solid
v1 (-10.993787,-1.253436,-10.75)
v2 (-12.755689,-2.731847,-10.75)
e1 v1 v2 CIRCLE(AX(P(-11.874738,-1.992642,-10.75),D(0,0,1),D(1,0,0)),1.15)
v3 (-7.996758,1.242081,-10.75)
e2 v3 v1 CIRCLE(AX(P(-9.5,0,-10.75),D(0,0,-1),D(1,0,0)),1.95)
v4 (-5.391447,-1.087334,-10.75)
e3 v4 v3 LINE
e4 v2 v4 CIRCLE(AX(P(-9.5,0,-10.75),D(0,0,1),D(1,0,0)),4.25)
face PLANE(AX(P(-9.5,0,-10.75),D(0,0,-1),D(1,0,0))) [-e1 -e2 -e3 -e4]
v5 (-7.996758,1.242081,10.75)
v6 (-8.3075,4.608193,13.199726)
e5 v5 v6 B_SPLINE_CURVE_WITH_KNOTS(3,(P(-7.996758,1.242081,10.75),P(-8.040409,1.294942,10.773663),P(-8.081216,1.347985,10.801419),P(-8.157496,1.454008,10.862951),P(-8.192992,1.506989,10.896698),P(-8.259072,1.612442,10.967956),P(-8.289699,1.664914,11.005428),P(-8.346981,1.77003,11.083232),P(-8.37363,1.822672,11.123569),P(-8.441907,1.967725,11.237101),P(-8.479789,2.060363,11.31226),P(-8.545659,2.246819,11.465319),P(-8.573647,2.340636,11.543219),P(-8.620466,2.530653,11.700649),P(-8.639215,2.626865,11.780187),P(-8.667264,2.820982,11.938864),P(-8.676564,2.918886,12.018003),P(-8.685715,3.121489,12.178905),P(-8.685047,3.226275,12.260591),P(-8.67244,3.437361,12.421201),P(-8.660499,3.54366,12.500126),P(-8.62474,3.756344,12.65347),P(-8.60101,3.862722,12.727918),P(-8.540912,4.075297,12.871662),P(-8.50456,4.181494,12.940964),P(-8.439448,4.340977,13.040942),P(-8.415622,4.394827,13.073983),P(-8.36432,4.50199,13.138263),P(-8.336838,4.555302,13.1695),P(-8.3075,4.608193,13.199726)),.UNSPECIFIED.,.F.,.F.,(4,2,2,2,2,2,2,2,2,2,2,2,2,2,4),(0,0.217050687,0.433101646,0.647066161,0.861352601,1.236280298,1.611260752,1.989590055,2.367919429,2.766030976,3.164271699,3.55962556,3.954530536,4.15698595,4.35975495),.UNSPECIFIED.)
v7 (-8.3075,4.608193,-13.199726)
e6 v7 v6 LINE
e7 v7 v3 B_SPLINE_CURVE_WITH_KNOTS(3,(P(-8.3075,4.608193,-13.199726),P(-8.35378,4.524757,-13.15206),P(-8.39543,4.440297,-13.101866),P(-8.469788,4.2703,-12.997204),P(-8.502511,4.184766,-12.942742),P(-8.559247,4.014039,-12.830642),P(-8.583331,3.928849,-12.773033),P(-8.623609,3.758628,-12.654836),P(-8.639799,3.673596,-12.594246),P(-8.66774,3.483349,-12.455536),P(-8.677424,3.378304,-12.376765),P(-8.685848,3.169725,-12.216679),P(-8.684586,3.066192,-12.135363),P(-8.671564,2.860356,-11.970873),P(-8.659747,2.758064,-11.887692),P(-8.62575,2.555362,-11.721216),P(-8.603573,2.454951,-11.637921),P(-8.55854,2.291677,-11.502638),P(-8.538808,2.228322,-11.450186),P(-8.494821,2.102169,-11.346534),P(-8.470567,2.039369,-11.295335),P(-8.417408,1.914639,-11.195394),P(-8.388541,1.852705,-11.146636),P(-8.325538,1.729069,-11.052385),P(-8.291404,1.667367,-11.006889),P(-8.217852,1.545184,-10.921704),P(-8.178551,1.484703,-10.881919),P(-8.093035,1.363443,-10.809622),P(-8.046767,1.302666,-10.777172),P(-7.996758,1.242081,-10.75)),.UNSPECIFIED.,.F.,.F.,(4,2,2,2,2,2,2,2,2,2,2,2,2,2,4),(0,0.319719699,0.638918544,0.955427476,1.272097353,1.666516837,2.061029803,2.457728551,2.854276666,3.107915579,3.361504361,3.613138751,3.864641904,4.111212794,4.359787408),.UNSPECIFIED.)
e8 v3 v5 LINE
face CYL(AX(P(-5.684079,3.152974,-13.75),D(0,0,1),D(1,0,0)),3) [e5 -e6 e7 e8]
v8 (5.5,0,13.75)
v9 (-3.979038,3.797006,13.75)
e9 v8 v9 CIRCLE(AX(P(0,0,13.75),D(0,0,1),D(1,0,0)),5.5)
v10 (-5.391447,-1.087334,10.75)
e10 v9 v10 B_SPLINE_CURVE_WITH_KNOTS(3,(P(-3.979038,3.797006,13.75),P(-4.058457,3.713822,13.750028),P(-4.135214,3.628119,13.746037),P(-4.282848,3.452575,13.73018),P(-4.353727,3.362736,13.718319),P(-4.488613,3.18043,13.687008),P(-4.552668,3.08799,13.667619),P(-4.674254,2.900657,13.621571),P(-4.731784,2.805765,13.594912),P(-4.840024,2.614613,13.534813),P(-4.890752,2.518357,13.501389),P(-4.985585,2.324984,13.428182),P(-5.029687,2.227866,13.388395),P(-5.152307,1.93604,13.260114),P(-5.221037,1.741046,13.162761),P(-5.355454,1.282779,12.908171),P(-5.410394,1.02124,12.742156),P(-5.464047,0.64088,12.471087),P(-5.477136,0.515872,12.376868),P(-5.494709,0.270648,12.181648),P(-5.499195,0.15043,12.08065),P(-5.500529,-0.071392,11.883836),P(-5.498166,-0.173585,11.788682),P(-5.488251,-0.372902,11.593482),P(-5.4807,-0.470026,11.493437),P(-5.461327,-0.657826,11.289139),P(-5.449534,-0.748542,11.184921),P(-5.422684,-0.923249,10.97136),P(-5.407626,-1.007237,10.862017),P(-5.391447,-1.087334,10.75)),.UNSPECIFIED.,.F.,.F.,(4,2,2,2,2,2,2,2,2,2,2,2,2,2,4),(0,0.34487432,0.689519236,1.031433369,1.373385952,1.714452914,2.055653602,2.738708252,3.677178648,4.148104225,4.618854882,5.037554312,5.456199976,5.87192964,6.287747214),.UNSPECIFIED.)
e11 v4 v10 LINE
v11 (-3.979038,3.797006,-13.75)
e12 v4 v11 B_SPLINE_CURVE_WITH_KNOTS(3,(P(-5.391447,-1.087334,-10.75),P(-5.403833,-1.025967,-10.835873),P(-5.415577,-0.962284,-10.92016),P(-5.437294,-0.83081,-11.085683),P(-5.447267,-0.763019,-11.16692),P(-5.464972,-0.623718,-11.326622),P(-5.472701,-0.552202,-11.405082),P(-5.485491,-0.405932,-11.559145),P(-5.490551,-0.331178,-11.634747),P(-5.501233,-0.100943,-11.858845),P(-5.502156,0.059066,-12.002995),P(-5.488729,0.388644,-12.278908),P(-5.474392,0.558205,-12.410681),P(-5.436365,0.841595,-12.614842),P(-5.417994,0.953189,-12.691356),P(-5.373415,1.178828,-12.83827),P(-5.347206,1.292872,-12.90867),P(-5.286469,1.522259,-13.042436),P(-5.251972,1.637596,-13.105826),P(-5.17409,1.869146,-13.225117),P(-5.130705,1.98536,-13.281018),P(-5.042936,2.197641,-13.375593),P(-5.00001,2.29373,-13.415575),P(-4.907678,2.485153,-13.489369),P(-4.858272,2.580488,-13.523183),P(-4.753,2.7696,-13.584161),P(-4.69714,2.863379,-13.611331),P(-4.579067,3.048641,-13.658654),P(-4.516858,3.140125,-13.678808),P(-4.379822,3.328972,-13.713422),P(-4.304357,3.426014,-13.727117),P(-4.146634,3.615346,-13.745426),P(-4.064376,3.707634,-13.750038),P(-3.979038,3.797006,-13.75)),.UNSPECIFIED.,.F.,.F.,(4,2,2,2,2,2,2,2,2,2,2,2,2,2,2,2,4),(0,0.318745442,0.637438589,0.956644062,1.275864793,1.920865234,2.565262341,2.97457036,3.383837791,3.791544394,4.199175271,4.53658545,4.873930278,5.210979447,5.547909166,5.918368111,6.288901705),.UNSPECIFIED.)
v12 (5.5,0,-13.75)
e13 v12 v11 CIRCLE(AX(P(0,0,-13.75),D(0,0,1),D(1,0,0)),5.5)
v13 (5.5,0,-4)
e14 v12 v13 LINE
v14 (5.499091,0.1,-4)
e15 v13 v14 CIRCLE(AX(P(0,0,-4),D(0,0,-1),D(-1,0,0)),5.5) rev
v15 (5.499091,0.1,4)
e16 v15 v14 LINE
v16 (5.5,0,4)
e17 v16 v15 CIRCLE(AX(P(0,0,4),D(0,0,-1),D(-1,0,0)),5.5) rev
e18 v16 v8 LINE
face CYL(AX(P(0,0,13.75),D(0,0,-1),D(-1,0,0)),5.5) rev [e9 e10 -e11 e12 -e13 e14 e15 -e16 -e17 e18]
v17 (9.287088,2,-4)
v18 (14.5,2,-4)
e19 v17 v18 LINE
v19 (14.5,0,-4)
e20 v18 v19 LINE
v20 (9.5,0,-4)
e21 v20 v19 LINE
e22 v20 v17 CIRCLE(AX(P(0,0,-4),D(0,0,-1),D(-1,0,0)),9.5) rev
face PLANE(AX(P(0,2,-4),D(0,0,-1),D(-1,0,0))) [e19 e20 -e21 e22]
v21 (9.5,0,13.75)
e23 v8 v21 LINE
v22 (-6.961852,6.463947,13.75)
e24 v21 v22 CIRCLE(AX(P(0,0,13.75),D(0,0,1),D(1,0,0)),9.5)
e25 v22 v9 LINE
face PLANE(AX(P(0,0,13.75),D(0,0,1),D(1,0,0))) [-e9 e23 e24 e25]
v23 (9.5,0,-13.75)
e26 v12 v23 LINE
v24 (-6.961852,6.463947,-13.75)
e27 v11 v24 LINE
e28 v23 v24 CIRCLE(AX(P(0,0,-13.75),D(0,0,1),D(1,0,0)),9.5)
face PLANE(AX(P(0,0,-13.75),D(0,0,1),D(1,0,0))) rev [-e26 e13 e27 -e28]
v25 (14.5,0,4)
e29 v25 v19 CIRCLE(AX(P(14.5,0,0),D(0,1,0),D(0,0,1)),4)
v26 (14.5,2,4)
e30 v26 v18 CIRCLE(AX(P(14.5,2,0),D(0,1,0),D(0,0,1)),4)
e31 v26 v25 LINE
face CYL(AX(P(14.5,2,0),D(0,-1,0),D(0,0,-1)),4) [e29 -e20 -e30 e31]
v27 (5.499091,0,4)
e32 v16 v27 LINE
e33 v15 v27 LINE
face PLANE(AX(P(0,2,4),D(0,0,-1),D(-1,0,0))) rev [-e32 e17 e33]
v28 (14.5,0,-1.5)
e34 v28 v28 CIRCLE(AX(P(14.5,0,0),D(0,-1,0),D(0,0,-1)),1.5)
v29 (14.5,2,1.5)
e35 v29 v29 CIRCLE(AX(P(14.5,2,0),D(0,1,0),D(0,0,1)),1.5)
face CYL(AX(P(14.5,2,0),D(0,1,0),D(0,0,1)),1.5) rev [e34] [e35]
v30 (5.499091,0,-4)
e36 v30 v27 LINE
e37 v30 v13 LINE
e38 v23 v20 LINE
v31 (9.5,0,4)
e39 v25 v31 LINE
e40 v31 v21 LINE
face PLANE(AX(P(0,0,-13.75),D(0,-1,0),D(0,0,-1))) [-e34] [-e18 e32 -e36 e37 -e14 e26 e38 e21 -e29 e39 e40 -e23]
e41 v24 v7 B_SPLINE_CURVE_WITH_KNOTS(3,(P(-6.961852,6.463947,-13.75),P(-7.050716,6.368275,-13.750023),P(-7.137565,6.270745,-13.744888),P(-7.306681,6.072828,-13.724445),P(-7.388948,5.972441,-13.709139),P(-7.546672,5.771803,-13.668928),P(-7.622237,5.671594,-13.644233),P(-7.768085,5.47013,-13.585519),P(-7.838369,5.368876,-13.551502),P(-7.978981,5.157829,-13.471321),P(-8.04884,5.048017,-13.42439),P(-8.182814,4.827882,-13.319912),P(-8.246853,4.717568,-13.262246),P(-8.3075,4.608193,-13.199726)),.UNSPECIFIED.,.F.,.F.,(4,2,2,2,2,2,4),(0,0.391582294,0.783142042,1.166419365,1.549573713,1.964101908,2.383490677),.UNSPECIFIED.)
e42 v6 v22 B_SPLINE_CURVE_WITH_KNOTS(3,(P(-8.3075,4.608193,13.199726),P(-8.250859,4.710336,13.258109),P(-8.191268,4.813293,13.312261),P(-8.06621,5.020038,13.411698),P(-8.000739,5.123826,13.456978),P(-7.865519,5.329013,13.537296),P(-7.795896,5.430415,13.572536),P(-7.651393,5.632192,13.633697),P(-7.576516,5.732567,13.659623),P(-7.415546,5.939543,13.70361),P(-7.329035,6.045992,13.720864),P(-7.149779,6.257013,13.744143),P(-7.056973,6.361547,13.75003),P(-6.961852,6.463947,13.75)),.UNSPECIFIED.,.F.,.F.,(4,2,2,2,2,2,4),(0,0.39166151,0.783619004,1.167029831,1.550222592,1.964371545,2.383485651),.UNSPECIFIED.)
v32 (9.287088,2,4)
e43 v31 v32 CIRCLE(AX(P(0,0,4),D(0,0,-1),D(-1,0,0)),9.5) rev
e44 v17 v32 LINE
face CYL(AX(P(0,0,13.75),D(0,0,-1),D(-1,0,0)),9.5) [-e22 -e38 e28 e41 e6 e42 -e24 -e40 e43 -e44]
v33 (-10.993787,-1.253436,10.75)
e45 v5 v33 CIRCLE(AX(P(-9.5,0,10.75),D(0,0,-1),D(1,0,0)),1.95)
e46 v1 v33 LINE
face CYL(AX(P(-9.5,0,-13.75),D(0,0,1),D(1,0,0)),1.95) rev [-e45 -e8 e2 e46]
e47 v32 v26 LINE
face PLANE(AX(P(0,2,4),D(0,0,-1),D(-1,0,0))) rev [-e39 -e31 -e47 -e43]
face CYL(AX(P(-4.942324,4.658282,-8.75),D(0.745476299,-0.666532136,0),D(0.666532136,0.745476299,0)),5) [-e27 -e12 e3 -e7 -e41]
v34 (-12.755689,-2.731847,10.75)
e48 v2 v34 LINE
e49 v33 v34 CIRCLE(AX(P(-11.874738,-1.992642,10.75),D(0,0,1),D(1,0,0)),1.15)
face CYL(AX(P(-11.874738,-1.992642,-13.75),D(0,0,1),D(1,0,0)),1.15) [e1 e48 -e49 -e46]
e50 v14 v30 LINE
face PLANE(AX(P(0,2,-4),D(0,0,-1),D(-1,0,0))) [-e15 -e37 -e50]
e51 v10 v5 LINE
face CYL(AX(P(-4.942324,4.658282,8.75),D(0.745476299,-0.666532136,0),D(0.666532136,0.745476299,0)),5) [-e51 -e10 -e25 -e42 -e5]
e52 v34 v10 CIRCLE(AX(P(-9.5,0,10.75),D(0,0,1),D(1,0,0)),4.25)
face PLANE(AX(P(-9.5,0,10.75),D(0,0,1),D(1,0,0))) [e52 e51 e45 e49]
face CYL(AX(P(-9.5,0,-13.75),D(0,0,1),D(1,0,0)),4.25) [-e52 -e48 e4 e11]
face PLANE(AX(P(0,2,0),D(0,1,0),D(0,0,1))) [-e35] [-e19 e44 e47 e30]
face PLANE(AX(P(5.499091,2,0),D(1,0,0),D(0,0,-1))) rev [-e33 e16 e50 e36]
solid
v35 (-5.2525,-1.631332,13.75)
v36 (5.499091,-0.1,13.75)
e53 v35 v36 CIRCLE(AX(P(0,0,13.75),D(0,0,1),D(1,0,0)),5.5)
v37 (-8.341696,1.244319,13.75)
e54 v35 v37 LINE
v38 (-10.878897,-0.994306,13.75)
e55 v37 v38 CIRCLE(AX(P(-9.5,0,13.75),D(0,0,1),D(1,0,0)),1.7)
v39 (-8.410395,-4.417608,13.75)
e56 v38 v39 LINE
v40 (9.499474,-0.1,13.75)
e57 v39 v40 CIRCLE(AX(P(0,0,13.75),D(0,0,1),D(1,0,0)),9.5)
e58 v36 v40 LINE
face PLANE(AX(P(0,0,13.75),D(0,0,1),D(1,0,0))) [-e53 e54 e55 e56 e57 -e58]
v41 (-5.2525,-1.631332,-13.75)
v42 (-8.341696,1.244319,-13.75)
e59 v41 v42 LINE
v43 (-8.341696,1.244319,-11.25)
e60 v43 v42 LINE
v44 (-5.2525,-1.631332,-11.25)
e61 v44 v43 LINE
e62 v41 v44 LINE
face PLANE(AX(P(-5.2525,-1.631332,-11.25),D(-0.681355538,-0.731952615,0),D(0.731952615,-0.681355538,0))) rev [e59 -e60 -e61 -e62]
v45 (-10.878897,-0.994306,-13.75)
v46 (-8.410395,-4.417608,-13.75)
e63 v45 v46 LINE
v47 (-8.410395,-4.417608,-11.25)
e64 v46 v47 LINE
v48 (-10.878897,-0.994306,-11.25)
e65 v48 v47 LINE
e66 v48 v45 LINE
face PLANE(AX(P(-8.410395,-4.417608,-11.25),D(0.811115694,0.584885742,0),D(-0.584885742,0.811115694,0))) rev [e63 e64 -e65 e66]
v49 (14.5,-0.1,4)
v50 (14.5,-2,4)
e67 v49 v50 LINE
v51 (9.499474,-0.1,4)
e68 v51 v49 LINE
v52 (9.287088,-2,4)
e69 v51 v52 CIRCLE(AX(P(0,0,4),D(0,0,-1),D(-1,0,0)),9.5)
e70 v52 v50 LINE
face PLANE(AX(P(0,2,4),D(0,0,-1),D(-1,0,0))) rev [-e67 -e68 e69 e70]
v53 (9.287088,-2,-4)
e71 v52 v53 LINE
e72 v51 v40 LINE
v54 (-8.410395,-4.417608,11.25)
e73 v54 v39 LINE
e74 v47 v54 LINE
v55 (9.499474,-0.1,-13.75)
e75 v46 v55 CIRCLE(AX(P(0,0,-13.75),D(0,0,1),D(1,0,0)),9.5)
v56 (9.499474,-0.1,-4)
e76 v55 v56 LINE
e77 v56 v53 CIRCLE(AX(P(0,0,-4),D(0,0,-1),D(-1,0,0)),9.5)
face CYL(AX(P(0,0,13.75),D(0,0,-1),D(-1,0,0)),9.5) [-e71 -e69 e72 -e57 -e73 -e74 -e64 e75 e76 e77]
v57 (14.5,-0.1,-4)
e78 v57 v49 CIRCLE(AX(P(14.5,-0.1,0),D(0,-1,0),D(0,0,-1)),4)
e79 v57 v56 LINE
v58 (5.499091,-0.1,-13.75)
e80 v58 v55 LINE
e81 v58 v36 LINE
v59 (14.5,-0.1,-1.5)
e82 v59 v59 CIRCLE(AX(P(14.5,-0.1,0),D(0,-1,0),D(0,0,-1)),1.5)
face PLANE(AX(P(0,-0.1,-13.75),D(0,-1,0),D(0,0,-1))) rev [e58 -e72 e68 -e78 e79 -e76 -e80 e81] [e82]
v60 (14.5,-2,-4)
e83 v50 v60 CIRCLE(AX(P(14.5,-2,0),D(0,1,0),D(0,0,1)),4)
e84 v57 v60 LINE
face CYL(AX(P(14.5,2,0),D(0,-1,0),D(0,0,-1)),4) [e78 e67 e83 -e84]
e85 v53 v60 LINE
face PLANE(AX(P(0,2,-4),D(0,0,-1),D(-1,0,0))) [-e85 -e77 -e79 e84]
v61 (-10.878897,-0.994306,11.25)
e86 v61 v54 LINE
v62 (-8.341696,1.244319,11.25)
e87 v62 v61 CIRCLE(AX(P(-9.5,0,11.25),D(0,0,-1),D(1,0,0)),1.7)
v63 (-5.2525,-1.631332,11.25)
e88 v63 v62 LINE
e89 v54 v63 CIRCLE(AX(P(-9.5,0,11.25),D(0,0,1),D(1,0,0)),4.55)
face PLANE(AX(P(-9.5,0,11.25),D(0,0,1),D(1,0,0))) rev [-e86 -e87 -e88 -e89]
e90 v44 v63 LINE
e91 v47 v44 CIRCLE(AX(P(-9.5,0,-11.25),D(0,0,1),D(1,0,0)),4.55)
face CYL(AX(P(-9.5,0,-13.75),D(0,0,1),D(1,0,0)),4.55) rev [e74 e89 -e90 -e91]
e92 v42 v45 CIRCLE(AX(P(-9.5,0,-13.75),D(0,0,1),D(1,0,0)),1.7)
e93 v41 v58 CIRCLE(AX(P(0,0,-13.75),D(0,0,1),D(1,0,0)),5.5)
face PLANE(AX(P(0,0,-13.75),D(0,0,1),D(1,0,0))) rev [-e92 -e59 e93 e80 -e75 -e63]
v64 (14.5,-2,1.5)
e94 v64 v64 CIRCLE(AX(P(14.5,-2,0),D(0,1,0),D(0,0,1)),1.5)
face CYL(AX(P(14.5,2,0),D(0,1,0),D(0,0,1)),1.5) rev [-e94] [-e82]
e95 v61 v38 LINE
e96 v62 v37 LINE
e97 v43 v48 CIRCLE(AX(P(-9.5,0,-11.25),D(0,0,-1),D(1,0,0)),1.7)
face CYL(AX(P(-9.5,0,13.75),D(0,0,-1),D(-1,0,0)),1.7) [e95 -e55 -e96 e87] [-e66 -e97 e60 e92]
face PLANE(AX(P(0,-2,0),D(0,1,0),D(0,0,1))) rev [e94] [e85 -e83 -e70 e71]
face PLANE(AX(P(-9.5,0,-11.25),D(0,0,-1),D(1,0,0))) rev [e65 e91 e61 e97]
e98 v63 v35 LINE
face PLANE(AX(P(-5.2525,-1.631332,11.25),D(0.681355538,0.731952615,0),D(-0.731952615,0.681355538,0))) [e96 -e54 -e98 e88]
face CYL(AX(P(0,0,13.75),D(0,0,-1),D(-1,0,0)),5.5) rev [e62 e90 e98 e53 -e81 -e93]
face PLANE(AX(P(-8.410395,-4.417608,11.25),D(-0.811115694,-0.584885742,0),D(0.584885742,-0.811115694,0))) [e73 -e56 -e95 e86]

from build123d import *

# Parameters (mm, degrees)
SKETCH1_R                = 9.5
SKETCH1_R_2              = 5.5
BOSS_EXTRUDE1_DEPTH      = 13.75
CUT_EXTRUDE2_DEPTH       = 31.606371886
CUT_EXTRUDE3_DEPTH       = 31.606371886
BOSS_EXTRUDE3_DEPTH      = 27.5
BOSS_EXTRUDE4_DEPTH      = 13.75
BOSS_EXTRUDE4_DEPTH_BACK = 13.75
SKETCH8_R                = 1.7
BOSS_EXTRUDE5_DEPTH      = 2.5
CUT_EXTRUDE4_DEPTH       = 3
FILLET1_R                = 5
BOSS_EXTRUDE6_DEPTH      = 2
SKETCH13_W               = 13.523517167
SKETCH13_H               = 0.1
CUT_EXTRUDE5_DEPTH       = 28.3415893


with BuildPart() as part:
    # Sketch1 → Boss-Extrude1 (new, symmetric)
    with BuildSketch(Plane.XY):
        Circle(SKETCH1_R)
        Circle(SKETCH1_R_2, mode=Mode.SUBTRACT)
    extrude(amount=BOSS_EXTRUDE1_DEPTH, both=True)

    # Sketch3 → Cut-Extrude2 (cut, through all)
    with BuildSketch(Plane.XY.offset(13.75)):
        with BuildLine():
            ThreePointArc((5.5, 0), (5.499772704, -0.050002066), (5.499090834, -0.1))
            Line((5.499090834, -0.1), (9.49947367, -0.1))
            ThreePointArc((9.49947367, -0.1), (9.499868416, -0.050000693), (9.5, 0))
            Line((9.5, 0), (5.5, 0))
        make_face()
        with BuildLine():
            ThreePointArc((-8.410394737, -4.417607992), (-6.489683277, -3.411816705), (-5.2525, -1.631331894))
            ThreePointArc((-5.2525, -1.631331894), (-5.328919902, -1.361107153), (-5.391447368, -1.087334021))
            ThreePointArc((-5.391447368, -1.087334021), (-6.544982985, -3.054566162), (-8.549342105, -4.142312104))
            ThreePointArc((-8.549342105, -4.142312104), (-8.48098552, -4.28052387), (-8.410394737, -4.417607992))
        make_face()
    extrude(amount=-CUT_EXTRUDE2_DEPTH, mode=Mode.SUBTRACT)


with BuildPart() as cut_extrude2_piece_1:
    # of the separate pieces the step leaves, piece 1, a body of its own (cut_extrude2_pieces)
    add(part.part.solids().sort_by_distance((9.5, 0, -13.75))[0])

    # Sketch4 → Cut-Extrude3 (cut, through all)
    with BuildSketch(Plane.XY.offset(13.75)):
        with BuildLine():
            ThreePointArc((-9.299868421, 1.939702903), (-8.579652656, 1.719145359), (-7.996758373, 1.242080759))
            ThreePointArc((-7.996758373, 1.242080759), (-8.67137707, 2.877202726), (-8.3075, 4.608193111))
            ThreePointArc((-8.3075, 4.608193111), (-8.904216174, 3.311334221), (-9.299868421, 1.939702903))
        make_face()
        with BuildLine():
            ThreePointArc((-9.299868421, -1.939702903), (-8.052112473, -1.30618594), (-7.55, 0))
            ThreePointArc((-7.55, 0), (-7.665085673, 0.65999198), (-7.996758373, 1.242080759))
            ThreePointArc((-7.996758373, 1.242080759), (-8.579652656, 1.719145359), (-9.299868421, 1.939702903))
            ThreePointArc((-9.299868421, 1.939702903), (-9.5, 0), (-9.299868421, -1.939702903))
        make_face()
        with BuildLine():
            ThreePointArc((-9.299868421, 1.939702903), (-11.45, 0), (-9.299868421, -1.939702903))
            ThreePointArc((-9.299868421, -1.939702903), (-9.5, 0), (-9.299868421, 1.939702903))
        make_face()
    extrude(amount=-CUT_EXTRUDE3_DEPTH, mode=Mode.SUBTRACT)

    # Sketch5 → Boss-Extrude3 (add, through all)
    with BuildSketch(Plane.XY.offset(13.75)):
        with BuildLine():
            Line((-10.993786664, -1.253435839), (-12.755688883, -2.731847341))
            ThreePointArc((-12.755688883, -2.731847341), (-10.851164193, -4.029498148), (-8.549342105, -4.142312104))
            ThreePointArc((-8.549342105, -4.142312104), (-8.992299535, -3.064073934), (-9.299868421, -1.939702903))
            ThreePointArc((-9.299868421, -1.939702903), (-10.23220659, -1.807311127), (-10.993786664, -1.253435839))
        make_face()
        with BuildLine():
            ThreePointArc((-10.993786664, -1.253435839), (-12.613943525, -1.11169048), (-12.755688883, -2.731847341))
            Line((-12.755688883, -2.731847341), (-10.993786664, -1.253435839))
        make_face()
    extrude(amount=-BOSS_EXTRUDE3_DEPTH)

    # Sketch11 → Cut-Extrude4 (cut)
    with BuildSketch(Plane.XY.offset(13.75)):
        with BuildLine():
            Line((-7.996758373, 1.242080759), (-5.391447368, -1.087334021))
            ThreePointArc((-5.391447368, -1.087334021), (-8.57374401, -4.147836767), (-12.755688883, -2.731847341))
            ThreePointArc((-12.755688883, -2.731847341), (-12.613943525, -1.11169048), (-10.993786664, -1.253435839))
            ThreePointArc((-10.993786664, -1.253435839), (-8.252232745, -1.498524901), (-7.996758373, 1.242080759))
        make_face()
    cut_extrude4 = extrude(amount=-CUT_EXTRUDE4_DEPTH, mode=Mode.SUBTRACT)

    # Mirror2: Cut-Extrude4 across plane
    add(cut_extrude4.mirror(Plane.XY), mode=Mode.SUBTRACT)

    # Fillet1
    # the kernel refuses this fillet: 5 mm, written as the material it takes off along each edge
    with BuildSketch(Plane(origin=(-16.537262293, 8.878165672, 13.75), x_dir=(0.6665321357814128, 0.7454762987316689, 0), z_dir=(0.7454762987316689, -0.6665321357814128, 0))) as fillet1_piece_1:
        with BuildLine():
            CenterArc((4.582575695, -5), FILLET1_R, 90, 66.421821522)
            Line((0, -3), (0, 0))
            Line((0, 0), (4.582575695, 0))
        make_face()
    extrude(amount=26.407705888, mode=Mode.SUBTRACT)
    with BuildSketch(Plane(origin=(-16.537262293, 8.878165672, -13.75), x_dir=(0.6665321357814128, 0.7454762987316689, 0), z_dir=(0.7454762987316689, -0.6665321357814128, 0))) as fillet1_piece_2:
        with BuildLine():
            CenterArc((4.582575695, 5), FILLET1_R, 203.578178478, 66.421821522)
            Line((0, 3), (0, 0))
            Line((0, 0), (4.582575695, 0))
        make_face()
    extrude(amount=26.407705888, mode=Mode.SUBTRACT)



with BuildPart() as cut_extrude2_piece_2:
    # of the separate pieces the step leaves, piece 2, a body of its own (cut_extrude2_pieces)
    add(part.part.solids().sort_by_distance((-8.410394737, -4.417607992, -13.75))[0])



with BuildPart() as body_3:
    # Sketch8 → Boss-Extrude4 (new, two sides: drawn at the far end of the back side and taken through both)
    with BuildSketch(Plane.XY.offset(-BOSS_EXTRUDE4_DEPTH_BACK)):
        with Locations((-9.5, 0)):
            Circle(SKETCH8_R)
    extrude(amount=BOSS_EXTRUDE4_DEPTH + BOSS_EXTRUDE4_DEPTH_BACK)


with BuildPart() as cut_extrude2_piece_2_1:
    add(cut_extrude2_piece_2.part)

    add(body_3.part)  # Boss-Extrude5 merges body 3
    # Sketch9 → Boss-Extrude5 (add)
    with BuildSketch(Plane.XY.offset(13.75)):
        with BuildLine():
            Line((-8.410394737, -4.417607992), (-10.878896679, -0.994305762))
            ThreePointArc((-10.878896679, -0.994305762), (-8.375266279, -1.274744703), (-8.341695586, 1.244319446))
            Line((-8.341695586, 1.244319446), (-5.2525, -1.631331894))
            ThreePointArc((-5.2525, -1.631331894), (-6.489683277, -3.411816705), (-8.410394737, -4.417607992))
        make_face()
    boss_extrude5 = extrude(amount=-BOSS_EXTRUDE5_DEPTH)

    # Mirror1: Boss-Extrude5 across plane
    add(boss_extrude5.mirror(Plane.XY))


with BuildPart() as cut_extrude2_piece_1_1:
    add(cut_extrude2_piece_1.part)

    add(cut_extrude2_piece_2_1.part)  # Boss-Extrude6 merges Cut-Extrude2 piece 2
    # Sketch12 → Boss-Extrude6 (add, symmetric)
    with BuildSketch(Plane(origin=(0, 0, 0), x_dir=(1, 0, 0), z_dir=(0, 1, 0))):
        with BuildLine():
            Line((14.5, 4), (5.499090834, 4))
            Line((5.499090834, 4), (5.499090834, -4))
            Line((5.499090834, -4), (14.5, -4))
            ThreePointArc((14.5, -4), (18.5, 0), (14.5, 4))
        make_face()
    extrude(amount=BOSS_EXTRUDE6_DEPTH, both=True)

    # Sketch13 → Cut-Extrude5 (cut, through all)
    with BuildSketch(Plane.XY.offset(4)):
        with Locations((12.260849418, -0.05)):
            Rectangle(SKETCH13_W, SKETCH13_H)
    extrude(amount=-CUT_EXTRUDE5_DEPTH, mode=Mode.SUBTRACT)


with BuildPart() as cut_extrude5_piece_1:
    # of the separate pieces the step leaves, piece 1, a body of its own (cut_extrude5_pieces)
    add(cut_extrude2_piece_1_1.part.solids().sort_by_distance((9.5, 0, 4))[0])


with BuildPart() as cut_extrude5_piece_2:
    # of the separate pieces the step leaves, piece 2, a body of its own (cut_extrude5_pieces)
    add(cut_extrude2_piece_1_1.part.solids().sort_by_distance((-8.410394737, -4.417607992, -11.25))[0])


with BuildPart() as f_1_0mm_dowel_hole1_tool:
    # Sketch15 → Ø1.0mm Dowel Hole1 (revolve)
    with BuildSketch(Plane(origin=(14.5, 2, 0), x_dir=(0, 0, 1), z_dir=(1, 0, 0))):
        Polygon((0, 0), (0, 50), (1.5, 49.098709071), (1.5, 0), align=None)
    revolve(axis=Axis((14.5, 8.35, 0), (0, -1, 0)))


with BuildPart() as cut_extrude5_piece_1_1:
    add(cut_extrude5_piece_1.part)

    # Ø1.0mm Dowel Hole1: cut by f_1_0mm_dowel_hole1_tool
    add(f_1_0mm_dowel_hole1_tool.part, mode=Mode.SUBTRACT)


with BuildPart() as cut_extrude5_piece_2_1:
    add(cut_extrude5_piece_2.part)

    # Ø1.0mm Dowel Hole1: cut by f_1_0mm_dowel_hole1_tool
    add(f_1_0mm_dowel_hole1_tool.part, mode=Mode.SUBTRACT)


solid = Compound([cut_extrude5_piece_1_1.part, cut_extrude5_piece_2_1.part])
